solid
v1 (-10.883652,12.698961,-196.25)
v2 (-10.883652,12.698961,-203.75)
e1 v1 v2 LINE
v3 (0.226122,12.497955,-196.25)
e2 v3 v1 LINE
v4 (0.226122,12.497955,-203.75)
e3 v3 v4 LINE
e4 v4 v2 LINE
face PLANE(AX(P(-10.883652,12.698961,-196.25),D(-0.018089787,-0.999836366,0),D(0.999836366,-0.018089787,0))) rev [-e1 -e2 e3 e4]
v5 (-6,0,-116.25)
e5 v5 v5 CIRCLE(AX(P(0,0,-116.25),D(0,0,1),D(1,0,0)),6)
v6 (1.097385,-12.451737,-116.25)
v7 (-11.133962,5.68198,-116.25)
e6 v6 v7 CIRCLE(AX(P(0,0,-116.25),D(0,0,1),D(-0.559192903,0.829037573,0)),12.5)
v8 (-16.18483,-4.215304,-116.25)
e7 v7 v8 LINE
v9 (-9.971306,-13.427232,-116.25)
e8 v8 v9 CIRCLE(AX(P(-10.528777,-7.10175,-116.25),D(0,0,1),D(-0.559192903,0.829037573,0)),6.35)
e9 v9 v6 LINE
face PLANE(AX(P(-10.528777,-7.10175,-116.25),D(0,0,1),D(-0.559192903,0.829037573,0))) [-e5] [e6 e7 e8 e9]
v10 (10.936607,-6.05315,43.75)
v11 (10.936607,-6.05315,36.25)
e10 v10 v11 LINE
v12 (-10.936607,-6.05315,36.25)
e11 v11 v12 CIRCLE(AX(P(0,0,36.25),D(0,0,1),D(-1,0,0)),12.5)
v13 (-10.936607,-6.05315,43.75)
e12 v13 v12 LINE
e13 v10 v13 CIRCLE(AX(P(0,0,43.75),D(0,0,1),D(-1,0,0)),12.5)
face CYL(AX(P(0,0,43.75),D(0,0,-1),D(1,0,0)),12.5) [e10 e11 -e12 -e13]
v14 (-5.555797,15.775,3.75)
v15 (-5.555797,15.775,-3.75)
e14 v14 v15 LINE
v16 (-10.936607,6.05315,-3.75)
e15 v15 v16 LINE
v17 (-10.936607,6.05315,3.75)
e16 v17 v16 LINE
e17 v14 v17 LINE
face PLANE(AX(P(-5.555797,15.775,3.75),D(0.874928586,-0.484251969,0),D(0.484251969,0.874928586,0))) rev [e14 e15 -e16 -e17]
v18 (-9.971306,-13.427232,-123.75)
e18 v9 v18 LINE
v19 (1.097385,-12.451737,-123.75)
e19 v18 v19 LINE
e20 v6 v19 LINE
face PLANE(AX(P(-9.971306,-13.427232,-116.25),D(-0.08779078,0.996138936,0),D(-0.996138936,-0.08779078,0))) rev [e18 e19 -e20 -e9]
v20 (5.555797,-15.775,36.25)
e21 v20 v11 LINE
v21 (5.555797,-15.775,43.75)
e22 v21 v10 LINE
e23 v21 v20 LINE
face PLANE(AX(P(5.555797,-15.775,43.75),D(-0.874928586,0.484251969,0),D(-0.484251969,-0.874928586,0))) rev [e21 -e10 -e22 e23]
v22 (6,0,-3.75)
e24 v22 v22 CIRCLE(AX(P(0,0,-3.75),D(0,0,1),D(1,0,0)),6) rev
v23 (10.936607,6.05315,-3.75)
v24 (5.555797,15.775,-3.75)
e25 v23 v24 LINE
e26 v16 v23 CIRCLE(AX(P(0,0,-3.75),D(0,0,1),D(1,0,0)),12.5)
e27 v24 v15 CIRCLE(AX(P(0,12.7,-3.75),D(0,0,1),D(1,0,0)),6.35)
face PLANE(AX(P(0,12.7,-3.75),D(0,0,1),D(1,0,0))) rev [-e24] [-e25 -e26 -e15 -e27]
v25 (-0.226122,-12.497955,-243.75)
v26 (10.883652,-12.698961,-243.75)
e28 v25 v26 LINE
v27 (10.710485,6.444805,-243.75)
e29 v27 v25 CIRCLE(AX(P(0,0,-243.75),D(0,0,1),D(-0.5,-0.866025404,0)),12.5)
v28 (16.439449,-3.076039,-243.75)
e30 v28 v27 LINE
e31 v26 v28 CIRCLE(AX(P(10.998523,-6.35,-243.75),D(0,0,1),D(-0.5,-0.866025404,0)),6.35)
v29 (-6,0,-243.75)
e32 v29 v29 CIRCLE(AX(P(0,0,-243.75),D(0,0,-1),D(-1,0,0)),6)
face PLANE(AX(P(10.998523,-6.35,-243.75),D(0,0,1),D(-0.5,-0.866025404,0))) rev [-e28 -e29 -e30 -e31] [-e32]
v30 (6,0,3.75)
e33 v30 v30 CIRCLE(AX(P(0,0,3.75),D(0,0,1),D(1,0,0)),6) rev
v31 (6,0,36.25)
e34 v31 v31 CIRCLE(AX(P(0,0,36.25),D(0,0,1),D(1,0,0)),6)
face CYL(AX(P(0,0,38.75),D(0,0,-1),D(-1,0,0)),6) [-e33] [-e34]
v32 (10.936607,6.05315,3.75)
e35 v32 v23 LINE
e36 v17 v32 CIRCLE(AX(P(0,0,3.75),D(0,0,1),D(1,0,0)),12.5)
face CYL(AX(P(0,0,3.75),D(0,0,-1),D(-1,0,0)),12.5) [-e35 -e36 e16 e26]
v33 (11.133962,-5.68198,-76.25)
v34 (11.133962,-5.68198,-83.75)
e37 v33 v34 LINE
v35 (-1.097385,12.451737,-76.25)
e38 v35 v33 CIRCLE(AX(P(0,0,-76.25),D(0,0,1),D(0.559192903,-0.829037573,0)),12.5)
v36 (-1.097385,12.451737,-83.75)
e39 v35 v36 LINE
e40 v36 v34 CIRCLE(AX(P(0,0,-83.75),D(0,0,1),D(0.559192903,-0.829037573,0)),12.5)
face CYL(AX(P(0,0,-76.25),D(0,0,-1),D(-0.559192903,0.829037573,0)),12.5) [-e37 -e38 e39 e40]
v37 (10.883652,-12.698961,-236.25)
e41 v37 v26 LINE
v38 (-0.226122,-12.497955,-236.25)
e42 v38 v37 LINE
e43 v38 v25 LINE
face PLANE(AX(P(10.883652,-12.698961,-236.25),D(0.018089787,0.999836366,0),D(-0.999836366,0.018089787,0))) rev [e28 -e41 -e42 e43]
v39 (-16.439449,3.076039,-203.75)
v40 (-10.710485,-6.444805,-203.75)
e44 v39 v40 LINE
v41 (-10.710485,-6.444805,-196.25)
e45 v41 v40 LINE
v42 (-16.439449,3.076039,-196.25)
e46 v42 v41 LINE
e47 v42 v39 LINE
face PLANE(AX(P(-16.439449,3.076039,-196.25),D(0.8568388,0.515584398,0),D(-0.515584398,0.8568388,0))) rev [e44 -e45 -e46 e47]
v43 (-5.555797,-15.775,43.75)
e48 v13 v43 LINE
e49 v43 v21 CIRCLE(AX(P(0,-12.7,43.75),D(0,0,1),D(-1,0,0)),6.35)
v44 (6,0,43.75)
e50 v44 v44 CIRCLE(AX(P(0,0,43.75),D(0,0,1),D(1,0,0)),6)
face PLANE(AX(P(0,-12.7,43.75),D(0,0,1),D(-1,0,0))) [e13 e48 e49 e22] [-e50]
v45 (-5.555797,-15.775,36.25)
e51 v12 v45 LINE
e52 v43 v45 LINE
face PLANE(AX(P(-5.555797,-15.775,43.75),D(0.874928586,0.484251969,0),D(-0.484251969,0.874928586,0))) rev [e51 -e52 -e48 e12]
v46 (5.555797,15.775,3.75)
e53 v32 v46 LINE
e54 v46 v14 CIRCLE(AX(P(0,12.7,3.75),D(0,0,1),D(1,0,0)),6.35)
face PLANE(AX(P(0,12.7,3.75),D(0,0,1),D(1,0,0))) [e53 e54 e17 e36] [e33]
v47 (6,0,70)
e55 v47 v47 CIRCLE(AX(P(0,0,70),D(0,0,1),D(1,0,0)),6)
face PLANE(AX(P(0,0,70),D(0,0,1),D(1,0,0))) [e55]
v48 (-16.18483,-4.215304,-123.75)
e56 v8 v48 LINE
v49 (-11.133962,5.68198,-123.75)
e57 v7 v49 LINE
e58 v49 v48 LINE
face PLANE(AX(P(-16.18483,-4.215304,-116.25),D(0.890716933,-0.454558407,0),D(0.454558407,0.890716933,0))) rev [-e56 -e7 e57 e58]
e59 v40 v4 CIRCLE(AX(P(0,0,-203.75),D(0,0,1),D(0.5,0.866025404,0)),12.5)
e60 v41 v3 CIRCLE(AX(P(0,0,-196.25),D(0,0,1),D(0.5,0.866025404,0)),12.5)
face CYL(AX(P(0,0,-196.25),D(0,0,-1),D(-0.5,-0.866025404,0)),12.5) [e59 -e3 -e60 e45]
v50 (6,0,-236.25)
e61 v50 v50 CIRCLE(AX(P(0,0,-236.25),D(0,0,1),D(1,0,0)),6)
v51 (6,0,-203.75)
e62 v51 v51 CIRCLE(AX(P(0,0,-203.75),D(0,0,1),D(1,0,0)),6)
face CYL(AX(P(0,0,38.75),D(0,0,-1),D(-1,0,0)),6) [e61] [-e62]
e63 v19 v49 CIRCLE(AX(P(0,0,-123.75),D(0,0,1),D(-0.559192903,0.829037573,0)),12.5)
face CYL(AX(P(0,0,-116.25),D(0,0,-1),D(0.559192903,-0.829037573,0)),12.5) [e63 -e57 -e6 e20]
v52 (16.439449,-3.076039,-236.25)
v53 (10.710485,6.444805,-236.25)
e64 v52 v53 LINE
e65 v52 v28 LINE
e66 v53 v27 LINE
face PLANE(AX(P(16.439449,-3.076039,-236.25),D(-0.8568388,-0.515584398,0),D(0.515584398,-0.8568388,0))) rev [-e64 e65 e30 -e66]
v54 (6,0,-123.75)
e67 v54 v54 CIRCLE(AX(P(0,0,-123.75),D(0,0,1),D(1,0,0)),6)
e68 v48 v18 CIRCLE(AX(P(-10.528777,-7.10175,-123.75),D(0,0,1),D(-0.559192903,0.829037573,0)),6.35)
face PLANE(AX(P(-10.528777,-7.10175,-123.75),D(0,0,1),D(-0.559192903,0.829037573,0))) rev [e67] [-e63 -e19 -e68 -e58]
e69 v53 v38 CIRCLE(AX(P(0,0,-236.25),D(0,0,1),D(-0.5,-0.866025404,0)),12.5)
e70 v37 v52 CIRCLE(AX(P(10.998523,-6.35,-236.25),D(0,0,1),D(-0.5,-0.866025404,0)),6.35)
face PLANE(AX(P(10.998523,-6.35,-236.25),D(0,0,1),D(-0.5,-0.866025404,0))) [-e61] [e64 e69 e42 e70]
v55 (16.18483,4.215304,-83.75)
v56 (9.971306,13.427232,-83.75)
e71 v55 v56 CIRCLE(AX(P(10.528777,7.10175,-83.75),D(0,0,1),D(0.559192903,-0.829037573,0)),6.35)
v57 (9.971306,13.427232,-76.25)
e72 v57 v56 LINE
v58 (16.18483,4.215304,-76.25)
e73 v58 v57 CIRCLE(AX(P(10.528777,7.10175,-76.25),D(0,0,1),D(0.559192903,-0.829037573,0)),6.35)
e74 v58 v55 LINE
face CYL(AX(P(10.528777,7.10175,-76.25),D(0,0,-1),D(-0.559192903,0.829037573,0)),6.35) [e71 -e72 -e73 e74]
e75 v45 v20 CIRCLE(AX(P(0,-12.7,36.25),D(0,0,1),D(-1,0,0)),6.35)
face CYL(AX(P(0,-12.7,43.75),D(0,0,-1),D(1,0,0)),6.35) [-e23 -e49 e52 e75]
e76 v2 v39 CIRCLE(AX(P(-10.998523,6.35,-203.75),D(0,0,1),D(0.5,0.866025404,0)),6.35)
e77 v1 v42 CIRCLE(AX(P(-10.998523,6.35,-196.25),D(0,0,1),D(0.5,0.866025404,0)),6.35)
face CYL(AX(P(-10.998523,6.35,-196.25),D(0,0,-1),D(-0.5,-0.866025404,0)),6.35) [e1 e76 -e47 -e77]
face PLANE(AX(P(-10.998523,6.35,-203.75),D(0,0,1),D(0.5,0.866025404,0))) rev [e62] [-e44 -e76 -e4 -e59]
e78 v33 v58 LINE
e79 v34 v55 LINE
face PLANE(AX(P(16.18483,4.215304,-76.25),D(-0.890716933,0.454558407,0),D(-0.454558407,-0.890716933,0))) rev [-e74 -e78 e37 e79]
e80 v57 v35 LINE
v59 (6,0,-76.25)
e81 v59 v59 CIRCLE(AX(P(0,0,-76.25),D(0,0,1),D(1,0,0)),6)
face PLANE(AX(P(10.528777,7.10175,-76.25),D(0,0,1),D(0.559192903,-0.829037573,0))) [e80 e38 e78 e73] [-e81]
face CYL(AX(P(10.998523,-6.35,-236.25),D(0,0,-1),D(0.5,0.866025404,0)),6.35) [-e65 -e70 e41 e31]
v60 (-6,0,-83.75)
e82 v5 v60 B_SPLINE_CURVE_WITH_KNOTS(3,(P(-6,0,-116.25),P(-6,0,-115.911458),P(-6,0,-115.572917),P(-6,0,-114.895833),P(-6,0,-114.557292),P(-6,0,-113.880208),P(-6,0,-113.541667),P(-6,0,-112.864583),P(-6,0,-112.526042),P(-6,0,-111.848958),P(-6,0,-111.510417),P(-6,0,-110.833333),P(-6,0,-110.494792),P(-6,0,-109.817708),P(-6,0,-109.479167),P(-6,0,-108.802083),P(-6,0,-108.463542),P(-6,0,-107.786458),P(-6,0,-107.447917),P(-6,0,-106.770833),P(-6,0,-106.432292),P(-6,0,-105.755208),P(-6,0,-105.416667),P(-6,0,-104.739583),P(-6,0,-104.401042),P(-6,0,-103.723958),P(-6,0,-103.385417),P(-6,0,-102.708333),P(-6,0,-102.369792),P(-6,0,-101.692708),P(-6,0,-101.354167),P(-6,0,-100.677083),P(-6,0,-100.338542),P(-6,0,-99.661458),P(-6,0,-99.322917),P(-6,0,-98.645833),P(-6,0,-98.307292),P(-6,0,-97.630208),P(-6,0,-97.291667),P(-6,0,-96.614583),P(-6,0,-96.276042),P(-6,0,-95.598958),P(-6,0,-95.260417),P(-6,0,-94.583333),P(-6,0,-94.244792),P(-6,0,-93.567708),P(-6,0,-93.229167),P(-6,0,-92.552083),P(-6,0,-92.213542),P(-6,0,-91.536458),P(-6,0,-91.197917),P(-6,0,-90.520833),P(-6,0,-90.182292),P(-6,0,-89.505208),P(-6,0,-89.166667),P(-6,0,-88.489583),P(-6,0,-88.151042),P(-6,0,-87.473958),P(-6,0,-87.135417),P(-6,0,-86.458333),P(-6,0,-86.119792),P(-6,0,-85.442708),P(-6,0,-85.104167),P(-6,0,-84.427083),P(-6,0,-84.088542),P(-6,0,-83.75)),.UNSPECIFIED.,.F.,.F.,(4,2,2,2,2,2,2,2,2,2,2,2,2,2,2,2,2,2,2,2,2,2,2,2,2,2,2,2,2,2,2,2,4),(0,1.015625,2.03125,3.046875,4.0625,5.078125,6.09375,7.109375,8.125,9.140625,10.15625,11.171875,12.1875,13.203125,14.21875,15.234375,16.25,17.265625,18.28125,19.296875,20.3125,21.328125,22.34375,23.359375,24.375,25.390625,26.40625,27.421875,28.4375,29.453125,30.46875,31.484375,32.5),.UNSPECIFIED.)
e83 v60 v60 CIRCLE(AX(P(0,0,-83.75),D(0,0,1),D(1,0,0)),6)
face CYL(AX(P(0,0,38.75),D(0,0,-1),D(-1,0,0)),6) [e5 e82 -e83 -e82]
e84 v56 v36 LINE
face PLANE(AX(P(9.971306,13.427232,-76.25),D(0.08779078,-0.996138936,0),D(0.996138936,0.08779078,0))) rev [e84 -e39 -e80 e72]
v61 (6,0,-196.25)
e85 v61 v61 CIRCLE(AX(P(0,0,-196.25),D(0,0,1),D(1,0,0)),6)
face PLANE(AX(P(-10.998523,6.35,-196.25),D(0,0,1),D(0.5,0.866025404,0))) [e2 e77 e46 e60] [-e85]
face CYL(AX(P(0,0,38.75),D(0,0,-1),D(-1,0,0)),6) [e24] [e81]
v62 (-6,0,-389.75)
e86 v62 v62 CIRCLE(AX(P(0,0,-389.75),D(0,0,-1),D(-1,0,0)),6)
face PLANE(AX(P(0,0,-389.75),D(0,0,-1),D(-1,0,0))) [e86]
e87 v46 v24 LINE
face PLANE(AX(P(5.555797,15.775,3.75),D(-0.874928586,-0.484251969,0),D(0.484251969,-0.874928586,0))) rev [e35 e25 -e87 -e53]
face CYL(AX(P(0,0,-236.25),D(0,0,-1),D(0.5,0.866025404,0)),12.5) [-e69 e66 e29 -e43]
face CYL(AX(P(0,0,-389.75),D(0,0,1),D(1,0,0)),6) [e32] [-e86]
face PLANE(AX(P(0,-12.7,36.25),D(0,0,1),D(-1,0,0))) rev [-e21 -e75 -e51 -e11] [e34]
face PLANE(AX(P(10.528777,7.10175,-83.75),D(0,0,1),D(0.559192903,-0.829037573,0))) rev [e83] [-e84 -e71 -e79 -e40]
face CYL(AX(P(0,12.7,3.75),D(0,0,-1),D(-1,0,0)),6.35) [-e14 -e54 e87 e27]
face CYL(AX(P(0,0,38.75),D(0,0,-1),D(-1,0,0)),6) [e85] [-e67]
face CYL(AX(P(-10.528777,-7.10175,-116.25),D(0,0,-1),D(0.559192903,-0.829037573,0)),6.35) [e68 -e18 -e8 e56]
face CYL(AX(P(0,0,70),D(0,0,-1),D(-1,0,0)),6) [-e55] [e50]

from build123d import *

# Parameters (mm, degrees)
SALIENTE_EXTRUIR1_DEPTH      = 3.75
S_LIDO_MOVER_COPIAR2_ANGLE   = 180
S_LIDO_MOVER_COPIAR4_START   = -243.75
S_LIDO_MOVER_COPIAR4_DEPTH   = 7.5
S_LIDO_MOVER_COPIAR4_START_2 = -203.75
S_LIDO_MOVER_COPIAR4_2_DEPTH = 7.5
S_LIDO_MOVER_COPIAR4_START_3 = -123.75
S_LIDO_MOVER_COPIAR4_3_DEPTH = 7.5
S_LIDO_MOVER_COPIAR4_START_4 = -83.75
S_LIDO_MOVER_COPIAR4_4_DEPTH = 7.5
S_LIDO_MOVER_COPIAR5_ANGLE   = 124
S_LIDO_MOVER_COPIAR6_ANGLE   = 120
CROQUIS5_R                   = 6
SALIENTE_EXTRUIR4_DEPTH      = 275
SALIENTE_EXTRUIR5_START      = 146
CROQUIS6_R                   = 6
SALIENTE_EXTRUIR5_DEPTH      = 146
CROQUIS7_R                   = 6
SALIENTE_EXTRUIR6_DEPTH      = 26.25


# Read off the part's stored shape, not the designer's step: Sólido-Mover/Copiar4
with BuildPart() as part:
    # Croquis1 → Saliente-Extruir1 (new, symmetric)
    with BuildSketch(Plane.XY):
        with BuildLine():
            Line((-5.555796523, 15.775), (-10.936607328, 6.053149606))
            ThreePointArc((-10.936607328, 6.053149606), (0, -12.5), (10.936607328, 6.053149606))
            Line((10.936607328, 6.053149606), (5.555796523, 15.775))
            ThreePointArc((5.555796523, 15.775), (0, 19.05), (-5.555796523, 15.775))
        make_face()
    extrude(amount=SALIENTE_EXTRUIR1_DEPTH, both=True)


with BuildPart() as body_2:
    # Sólido-Mover/Copiar1: copy of part
    add(part.part.moved(Location((0, 0, 40))))


with BuildPart() as body_2_1:
    # Sólido-Mover/Copiar2: moved
    add(body_2.part.rotate(Axis((0, 0, 0), (0, 0, 1)), S_LIDO_MOVER_COPIAR2_ANGLE))


with BuildPart() as body_3:
    # Sólido-Mover/Copiar4 outline → Sólido-Mover/Copiar4 (new body)
    with BuildSketch(Plane.XY.offset(S_LIDO_MOVER_COPIAR4_START)):
        with BuildLine():
            ThreePointArc((5.555796523, 15.775), (0, 19.05), (-5.555796523, 15.775))
            Line((-5.555796523, 15.775), (-10.936607328, 6.053149606))
            ThreePointArc((-10.936607328, 6.053149606), (-12.5, 0), (-10.936607328, -6.053149606))
            ThreePointArc((-10.936607328, -6.053149606), (0, -12.5), (10.936607328, -6.053149606))
            ThreePointArc((10.936607328, -6.053149606), (12.5, 0), (10.936607328, 6.053149606))
            Line((10.936607328, 6.053149606), (5.555796523, 15.775))
        make_face()
    extrude(amount=S_LIDO_MOVER_COPIAR4_DEPTH)


with BuildPart() as body_4:
    # S_lido-Mover_Copiar4 2 outline → S_lido-Mover_Copiar4 2 (new body)
    with BuildSketch(Plane.XY.offset(S_LIDO_MOVER_COPIAR4_START_2)):
        with BuildLine():
            Line((-10.936607328, -6.053149606), (-5.555796523, -15.775))
            ThreePointArc((-5.555796523, -15.775), (0, -19.05), (5.555796523, -15.775))
            Line((5.555796523, -15.775), (10.936607328, -6.053149606))
            ThreePointArc((10.936607328, -6.053149606), (0, 12.5), (-10.936607328, -6.053149606))
        make_face()
    extrude(amount=S_LIDO_MOVER_COPIAR4_2_DEPTH)


with BuildPart() as body_5:
    # S_lido-Mover_Copiar4 3 outline → S_lido-Mover_Copiar4 3 (new body)
    with BuildSketch(Plane.XY.offset(S_LIDO_MOVER_COPIAR4_START_3)):
        with BuildLine():
            ThreePointArc((5.555796523, 15.775), (0, 19.05), (-5.555796523, 15.775))
            Line((-5.555796523, 15.775), (-10.936607328, 6.053149606))
            ThreePointArc((-10.936607328, 6.053149606), (-12.5, 0), (-10.936607328, -6.053149606))
            ThreePointArc((-10.936607328, -6.053149606), (0, -12.5), (10.936607328, -6.053149606))
            ThreePointArc((10.936607328, -6.053149606), (12.5, 0), (10.936607328, 6.053149606))
            Line((10.936607328, 6.053149606), (5.555796523, 15.775))
        make_face()
    extrude(amount=S_LIDO_MOVER_COPIAR4_3_DEPTH)


with BuildPart() as body_6:
    # S_lido-Mover_Copiar4 4 outline → S_lido-Mover_Copiar4 4 (new body)
    with BuildSketch(Plane.XY.offset(S_LIDO_MOVER_COPIAR4_START_4)):
        with BuildLine():
            Line((-10.936607328, -6.053149606), (-5.555796523, -15.775))
            ThreePointArc((-5.555796523, -15.775), (0, -19.05), (5.555796523, -15.775))
            Line((5.555796523, -15.775), (10.936607328, -6.053149606))
            ThreePointArc((10.936607328, -6.053149606), (0, 12.5), (-10.936607328, -6.053149606))
        make_face()
    extrude(amount=S_LIDO_MOVER_COPIAR4_4_DEPTH)


with BuildPart() as body_6_1:
    # Sólido-Mover/Copiar5: moved
    add(body_6.part.rotate(Axis((0, 0, 0), (0, 0, 1)), S_LIDO_MOVER_COPIAR5_ANGLE))


with BuildPart() as body_5_1:
    # Sólido-Mover/Copiar5: moved
    add(body_5.part.rotate(Axis((0, 0, 0), (0, 0, 1)), S_LIDO_MOVER_COPIAR5_ANGLE))


with BuildPart() as body_3_1:
    # Sólido-Mover/Copiar6: moved
    add(body_3.part.rotate(Axis((0, 0, 0), (0, 0, -1)), S_LIDO_MOVER_COPIAR6_ANGLE))


with BuildPart() as body_4_1:
    # Sólido-Mover/Copiar6: moved
    add(body_4.part.rotate(Axis((0, 0, 0), (0, 0, -1)), S_LIDO_MOVER_COPIAR6_ANGLE))


with BuildPart() as part_1:
    add(part.part)

    add(body_2_1.part)  # Saliente-Extruir4 merges body 2

    add(body_3_1.part)  # Saliente-Extruir4 merges body 3

    add(body_4_1.part)  # Saliente-Extruir4 merges body 4

    add(body_5_1.part)  # Saliente-Extruir4 merges body 5

    add(body_6_1.part)  # Saliente-Extruir4 merges body 6
    # Croquis5 → Saliente-Extruir4 (add)
    with BuildSketch(Plane.XY.offset(-236.25)):
        Circle(CROQUIS5_R)
    extrude(amount=SALIENTE_EXTRUIR4_DEPTH)

    # Croquis6 → Saliente-Extruir5 (add)
    with BuildSketch(Plane(origin=(0, 0, -243.75), x_dir=(-1, 0, 0), z_dir=(0, 0, -1)).offset(SALIENTE_EXTRUIR5_START)):
        with Locations(Location((0, 0, 0), (0, 0, 180))):
            Circle(CROQUIS6_R)
    extrude(amount=-SALIENTE_EXTRUIR5_DEPTH)

    # Croquis7 → Saliente-Extruir6 (add)
    with BuildSketch(Plane.XY.offset(43.75)):
        Circle(CROQUIS7_R)
    extrude(amount=SALIENTE_EXTRUIR6_DEPTH)


solid = part_1.part
